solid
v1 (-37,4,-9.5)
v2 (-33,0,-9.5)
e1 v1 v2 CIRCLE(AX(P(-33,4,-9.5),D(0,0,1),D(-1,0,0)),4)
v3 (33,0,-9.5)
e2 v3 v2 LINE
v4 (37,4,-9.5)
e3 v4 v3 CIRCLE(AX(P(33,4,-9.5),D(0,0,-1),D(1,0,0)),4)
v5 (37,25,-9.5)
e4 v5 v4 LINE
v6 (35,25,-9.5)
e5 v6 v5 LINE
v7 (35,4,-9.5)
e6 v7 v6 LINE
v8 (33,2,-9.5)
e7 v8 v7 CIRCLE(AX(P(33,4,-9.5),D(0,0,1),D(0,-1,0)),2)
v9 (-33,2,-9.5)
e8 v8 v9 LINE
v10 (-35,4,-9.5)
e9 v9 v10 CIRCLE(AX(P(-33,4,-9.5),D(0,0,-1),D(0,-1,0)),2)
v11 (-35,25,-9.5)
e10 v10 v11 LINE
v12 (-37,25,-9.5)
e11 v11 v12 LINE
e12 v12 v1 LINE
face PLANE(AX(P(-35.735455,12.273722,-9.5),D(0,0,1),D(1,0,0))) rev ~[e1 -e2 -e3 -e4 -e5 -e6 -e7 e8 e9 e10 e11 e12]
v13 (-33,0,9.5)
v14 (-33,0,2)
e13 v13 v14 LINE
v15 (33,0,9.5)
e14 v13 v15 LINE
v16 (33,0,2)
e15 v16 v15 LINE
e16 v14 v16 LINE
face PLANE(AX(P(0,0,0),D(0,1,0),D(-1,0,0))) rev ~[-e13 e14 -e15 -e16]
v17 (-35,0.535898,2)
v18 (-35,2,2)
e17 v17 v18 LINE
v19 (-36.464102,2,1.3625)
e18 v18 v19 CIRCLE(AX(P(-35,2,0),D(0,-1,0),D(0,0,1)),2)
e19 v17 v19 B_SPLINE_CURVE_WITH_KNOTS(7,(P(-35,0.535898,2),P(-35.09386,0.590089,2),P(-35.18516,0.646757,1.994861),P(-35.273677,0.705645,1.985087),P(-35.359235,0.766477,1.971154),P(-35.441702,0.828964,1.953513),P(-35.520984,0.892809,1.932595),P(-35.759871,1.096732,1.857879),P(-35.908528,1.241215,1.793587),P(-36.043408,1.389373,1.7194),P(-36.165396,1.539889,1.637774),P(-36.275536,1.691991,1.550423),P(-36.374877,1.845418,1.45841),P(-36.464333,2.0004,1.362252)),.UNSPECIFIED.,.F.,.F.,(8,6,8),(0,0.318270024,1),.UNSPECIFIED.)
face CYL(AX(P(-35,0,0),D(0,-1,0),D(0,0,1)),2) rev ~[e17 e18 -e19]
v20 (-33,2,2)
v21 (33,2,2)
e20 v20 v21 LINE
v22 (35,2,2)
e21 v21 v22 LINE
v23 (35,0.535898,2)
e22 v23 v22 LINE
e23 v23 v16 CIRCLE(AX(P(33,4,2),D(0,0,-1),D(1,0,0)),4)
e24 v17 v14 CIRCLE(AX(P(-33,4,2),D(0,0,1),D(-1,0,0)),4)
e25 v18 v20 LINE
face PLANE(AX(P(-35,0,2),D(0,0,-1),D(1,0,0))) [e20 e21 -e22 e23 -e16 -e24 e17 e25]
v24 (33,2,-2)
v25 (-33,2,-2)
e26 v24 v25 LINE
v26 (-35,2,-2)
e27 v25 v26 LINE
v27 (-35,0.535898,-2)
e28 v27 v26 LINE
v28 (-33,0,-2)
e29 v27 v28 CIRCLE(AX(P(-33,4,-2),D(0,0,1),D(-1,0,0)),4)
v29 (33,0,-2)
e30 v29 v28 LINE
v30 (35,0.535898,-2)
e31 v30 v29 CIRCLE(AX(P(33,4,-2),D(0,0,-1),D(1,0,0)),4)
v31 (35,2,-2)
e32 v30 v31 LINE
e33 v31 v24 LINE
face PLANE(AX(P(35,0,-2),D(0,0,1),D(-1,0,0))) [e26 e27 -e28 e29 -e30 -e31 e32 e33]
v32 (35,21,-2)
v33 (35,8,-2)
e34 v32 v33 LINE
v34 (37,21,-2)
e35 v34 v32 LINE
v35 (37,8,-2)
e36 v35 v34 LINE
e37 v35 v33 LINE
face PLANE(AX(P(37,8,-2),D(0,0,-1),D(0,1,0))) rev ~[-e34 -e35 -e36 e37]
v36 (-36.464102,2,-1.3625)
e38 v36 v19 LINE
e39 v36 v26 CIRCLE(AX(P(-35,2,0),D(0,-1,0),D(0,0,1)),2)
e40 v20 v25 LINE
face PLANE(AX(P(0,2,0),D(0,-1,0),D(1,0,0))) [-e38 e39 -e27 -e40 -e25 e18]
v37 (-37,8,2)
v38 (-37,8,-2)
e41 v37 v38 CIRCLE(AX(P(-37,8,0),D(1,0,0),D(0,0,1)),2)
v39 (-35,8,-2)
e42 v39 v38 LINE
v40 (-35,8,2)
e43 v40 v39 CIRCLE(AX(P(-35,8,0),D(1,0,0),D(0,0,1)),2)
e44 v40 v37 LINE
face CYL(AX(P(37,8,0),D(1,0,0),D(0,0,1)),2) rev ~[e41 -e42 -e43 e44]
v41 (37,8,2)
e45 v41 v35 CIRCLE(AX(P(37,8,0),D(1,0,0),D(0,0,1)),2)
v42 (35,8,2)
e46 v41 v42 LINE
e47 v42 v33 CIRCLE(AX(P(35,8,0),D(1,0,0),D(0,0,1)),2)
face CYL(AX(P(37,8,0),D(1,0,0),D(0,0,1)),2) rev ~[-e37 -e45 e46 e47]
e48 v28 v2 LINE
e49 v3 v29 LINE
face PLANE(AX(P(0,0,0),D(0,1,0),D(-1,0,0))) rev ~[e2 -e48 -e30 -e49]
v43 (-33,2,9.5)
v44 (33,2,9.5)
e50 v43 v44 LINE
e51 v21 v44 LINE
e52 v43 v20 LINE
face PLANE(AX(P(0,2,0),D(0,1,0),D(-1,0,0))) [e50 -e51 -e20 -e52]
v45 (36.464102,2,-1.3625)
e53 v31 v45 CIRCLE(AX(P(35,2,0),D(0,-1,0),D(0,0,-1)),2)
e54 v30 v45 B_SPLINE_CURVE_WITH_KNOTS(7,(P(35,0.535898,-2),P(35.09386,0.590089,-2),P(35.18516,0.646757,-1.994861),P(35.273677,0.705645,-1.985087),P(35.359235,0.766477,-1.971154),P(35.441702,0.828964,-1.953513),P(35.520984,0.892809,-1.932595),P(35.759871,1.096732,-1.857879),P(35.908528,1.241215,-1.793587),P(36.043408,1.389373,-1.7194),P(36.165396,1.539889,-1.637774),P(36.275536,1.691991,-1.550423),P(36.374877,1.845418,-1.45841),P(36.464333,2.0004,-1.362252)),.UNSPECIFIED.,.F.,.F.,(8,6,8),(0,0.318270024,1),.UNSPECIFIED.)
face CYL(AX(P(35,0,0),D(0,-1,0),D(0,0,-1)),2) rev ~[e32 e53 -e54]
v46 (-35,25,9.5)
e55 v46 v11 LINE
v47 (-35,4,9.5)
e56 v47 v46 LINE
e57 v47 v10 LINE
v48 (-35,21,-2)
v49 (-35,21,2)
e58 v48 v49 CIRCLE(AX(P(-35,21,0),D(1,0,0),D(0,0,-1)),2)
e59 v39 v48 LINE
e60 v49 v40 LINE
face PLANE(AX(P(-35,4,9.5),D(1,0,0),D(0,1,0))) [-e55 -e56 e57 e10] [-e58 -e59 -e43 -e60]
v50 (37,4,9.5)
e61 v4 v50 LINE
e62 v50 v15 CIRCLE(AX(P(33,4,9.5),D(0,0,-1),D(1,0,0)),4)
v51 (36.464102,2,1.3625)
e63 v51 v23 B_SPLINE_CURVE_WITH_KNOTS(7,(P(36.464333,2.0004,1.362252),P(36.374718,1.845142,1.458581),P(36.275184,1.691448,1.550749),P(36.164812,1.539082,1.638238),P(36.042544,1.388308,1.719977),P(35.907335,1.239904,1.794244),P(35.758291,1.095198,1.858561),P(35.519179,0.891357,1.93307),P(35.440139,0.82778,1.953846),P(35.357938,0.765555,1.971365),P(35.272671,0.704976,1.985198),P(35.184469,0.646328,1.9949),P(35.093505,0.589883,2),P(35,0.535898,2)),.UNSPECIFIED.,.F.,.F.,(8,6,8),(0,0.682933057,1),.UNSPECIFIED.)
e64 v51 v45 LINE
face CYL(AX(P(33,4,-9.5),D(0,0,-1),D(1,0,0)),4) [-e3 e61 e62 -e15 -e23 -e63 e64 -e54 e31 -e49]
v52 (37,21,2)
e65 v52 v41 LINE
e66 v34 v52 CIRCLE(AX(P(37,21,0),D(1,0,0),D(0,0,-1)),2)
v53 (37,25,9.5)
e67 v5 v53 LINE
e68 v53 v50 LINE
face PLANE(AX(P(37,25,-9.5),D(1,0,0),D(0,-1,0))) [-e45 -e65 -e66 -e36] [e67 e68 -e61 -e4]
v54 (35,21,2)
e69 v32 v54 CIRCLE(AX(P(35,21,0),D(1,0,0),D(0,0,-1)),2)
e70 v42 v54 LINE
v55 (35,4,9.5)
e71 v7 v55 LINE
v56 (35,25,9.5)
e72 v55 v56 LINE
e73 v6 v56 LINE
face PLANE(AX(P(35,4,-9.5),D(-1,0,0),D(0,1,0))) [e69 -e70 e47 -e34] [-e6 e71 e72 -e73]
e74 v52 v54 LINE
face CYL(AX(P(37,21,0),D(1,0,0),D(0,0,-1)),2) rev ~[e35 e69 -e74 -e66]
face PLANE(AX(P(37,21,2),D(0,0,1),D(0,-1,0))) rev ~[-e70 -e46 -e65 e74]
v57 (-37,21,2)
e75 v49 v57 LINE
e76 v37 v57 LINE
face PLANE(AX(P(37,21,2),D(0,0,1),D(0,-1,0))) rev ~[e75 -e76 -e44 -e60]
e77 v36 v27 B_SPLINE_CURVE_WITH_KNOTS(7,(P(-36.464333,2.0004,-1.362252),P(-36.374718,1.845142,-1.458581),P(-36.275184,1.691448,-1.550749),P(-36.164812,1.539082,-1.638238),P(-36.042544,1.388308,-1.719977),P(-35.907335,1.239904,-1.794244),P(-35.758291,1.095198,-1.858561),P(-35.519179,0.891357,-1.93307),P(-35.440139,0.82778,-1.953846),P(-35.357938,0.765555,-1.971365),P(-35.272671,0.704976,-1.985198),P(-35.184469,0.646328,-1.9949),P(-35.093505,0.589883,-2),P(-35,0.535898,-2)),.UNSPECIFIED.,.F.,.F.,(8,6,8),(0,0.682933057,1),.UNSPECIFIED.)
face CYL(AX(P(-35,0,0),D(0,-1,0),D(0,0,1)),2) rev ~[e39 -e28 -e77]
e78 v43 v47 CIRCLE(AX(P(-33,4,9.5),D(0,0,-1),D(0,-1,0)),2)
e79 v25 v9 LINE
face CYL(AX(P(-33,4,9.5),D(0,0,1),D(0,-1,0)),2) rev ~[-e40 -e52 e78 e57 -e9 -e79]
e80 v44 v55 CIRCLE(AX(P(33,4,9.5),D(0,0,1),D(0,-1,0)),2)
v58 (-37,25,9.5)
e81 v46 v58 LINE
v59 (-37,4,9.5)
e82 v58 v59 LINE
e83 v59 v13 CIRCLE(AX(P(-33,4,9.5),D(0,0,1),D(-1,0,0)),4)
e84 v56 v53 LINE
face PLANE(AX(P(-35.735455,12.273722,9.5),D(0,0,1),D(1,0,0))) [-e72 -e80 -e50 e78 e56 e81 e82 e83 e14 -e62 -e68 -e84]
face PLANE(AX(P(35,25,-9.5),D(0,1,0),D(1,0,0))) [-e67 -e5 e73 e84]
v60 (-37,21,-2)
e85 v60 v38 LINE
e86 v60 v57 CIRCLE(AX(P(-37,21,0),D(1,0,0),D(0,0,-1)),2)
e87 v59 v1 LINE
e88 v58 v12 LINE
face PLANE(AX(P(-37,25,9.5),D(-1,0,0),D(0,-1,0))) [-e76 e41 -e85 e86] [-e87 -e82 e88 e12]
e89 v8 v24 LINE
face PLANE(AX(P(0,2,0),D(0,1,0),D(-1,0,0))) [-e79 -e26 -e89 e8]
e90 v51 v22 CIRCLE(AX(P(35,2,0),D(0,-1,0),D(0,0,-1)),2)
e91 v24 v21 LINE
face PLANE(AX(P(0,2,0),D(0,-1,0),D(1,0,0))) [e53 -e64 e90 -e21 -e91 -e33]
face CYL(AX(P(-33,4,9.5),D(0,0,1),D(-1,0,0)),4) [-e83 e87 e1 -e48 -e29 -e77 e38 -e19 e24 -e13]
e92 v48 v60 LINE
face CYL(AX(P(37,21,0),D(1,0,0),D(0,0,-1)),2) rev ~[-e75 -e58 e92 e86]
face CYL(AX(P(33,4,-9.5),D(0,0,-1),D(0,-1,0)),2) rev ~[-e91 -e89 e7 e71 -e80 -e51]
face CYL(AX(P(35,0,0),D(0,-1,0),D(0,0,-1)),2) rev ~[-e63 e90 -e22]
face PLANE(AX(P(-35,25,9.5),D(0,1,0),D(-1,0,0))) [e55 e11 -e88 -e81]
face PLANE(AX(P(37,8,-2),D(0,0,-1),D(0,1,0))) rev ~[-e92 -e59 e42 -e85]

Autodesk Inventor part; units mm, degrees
ref_plane "YZ Plane" through (0, 0, 0) normal (1, 0, 0) x (0, 1, 0)
ref_plane "XZ Plane" through (0, 0, 0) normal (0, 1, 0) x (-1, 0, 0)
ref_plane "XY Plane" through (0, 0, 0) normal (0, 0, 1) x (1, 0, 0)
sketch "スケッチ1" plane through (0, 0, 0) normal (0, 1, 0) x (-1, 0, 0)
  line L0 (-37, -9.5) -> (37, -9.5)
  line L1 (37, -9.5) -> (37, 9.5)
  line L2 (37, 9.5) -> (-37, 9.5)
  line L3 (-37, 9.5) -> (-37, -9.5)
  line L4 (-37, -9.5) -> (37, 9.5) construction
  line L5 (37, -9.5) -> (-37, 9.5) construction
  point P0 (0, 0)
  dimension "d0" = 74
  dimension "d1" = 19
extrude "プレート1" add sketch "スケッチ1" along normal blind 2
sketch "スケッチ2" plane through (35, 0, -9.5) normal (1, 0, 0) x (0, 1, 0)
  line L0 (0, 19) -> (0, 0)
  line L1 (0, 0) -> (25, 0)
  line L2 (25, 0) -> (25, 19)
  line L3 (25, 19) -> (0, 19)
edge flange "フランジ1" height 25 angle 90 thickness 2 bend radius 2 thickness toward (1, 0, 0) relief tear relief width 2 relief depth 1 edges at (37, 2, 0) wall of the first edge with corners at (35, 0, 9.5) (35, 0, -9.5) (35, 25, -9.5) (35, 25, 9.5)
bend "曲げ1"
corner "コーナー1"
sketch "スケッチ3" plane through (-35, 0, 9.5) normal (-1, 0, 0) x (0, -1, 0)
  line L0 (0, -19) -> (0, 0)
  line L1 (0, 0) -> (-25, 0)
  line L2 (-25, 0) -> (-25, -19)
  line L3 (-25, -19) -> (0, -19)
edge flange "フランジ2" height 25 angle 90 thickness 2 bend radius 2 thickness toward (-1, 0, 0) relief tear relief width 2 relief depth 1 edges at (-37, 2, 0) wall of the first edge with corners at (-35, 0, -9.5) (-35, 0, 9.5) (-35, 25, 9.5) (-35, 25, -9.5)
bend "曲げ2"
corner "コーナー2"
sketch "スケッチ5" plane through (0, 0, 0) normal (0, -1, 0) x (1, 0, 0)
  arc A0 (-35, 2) -> (-35, -2) centre (-35, 0) ccw
  arc A1 (35, -2) -> (35, 2) centre (35, 0) ccw
  line L0 (-35, 2) -> (35, 2)
  line L1 (35, -2) -> (-35, -2)
  point P0 (0, 0)
  dimension "d31" = 4
  dimension "d32" = 2
  dimension "d33" = 2
  dimension "d34" = 2
  dimension "d35" = 35
  dimension "d36" = 35
extrude "押し出し1" cut sketch "スケッチ5" against normal blind 2
sketch "スケッチ6" plane through (37, 25, 9.5) normal (1, 0, 0) x (0, 0, -1)
  point P0 (9.5, -25)
sketch "スケッチ7" plane through (37, 25, 9.5) normal (1, 0, 0) x (0, 0, -1)
  line L0 (7.5, -4) -> (7.5, -17)
  arc A0 (7.5, -17) -> (11.5, -17) centre (9.5, -17) ccw
  line L1 (11.5, -17) -> (11.5, -4)
  arc A1 (11.5, -4) -> (7.5, -4) centre (9.5, -4) ccw
  line L2 (0, 0) -> (19, 0) projected
  line L3 (0, -21) -> (19, -21) projected
  point P0 (9.5, -25)
  point P1 (9.5, 0)
  dimension "d45" = 4
  dimension "d46" = 4
  dimension "d47" = 2
extrude "押し出し2" cut sketch "スケッチ7" against normal blind 100
equation "\"d2\" = Thickness"
equation "\"d3\" = BendReliefWidth"
equation "\"d4\" = BendReliefDepth"
equation "\"d5\" = MinimumRemnant"
equation "\"d6\" = TransitionRadius"
equation "\"d9\" = BendRadius"
equation "\"d10\" = CornerReliefSize"
equation "\"d11\" = GapSize"
equation "\"d12\" = JacobiRadiusSize"
equation "\"d13\" = BendReliefWidth"
equation "\"d14\" = BendReliefDepth"
equation "\"d15\" = MinimumRemnant"
equation "\"d16\" = TransitionRadius"
equation "\"d19\" = BendRadius"
equation "\"d20\" = CornerReliefSize"
equation "\"d21\" = GapSize"
equation "\"d22\" = JacobiRadiusSize"
equation "\"BendRadius\" = Thickness"
equation "\"BendReliefWidth\" = Thickness"
equation "\"BendReliefDepth\" = 0.5 * Thickness"
equation "\"CornerReliefSize\" = 4 * Thickness"
equation "\"MinimumRemnant\" = 2 * Thickness"
equation "\"TransitionRadius\" = BendRadius"
equation "\"JacobiRadiusSize\" = BendRadius"
equation "\"GapSize\" = Thickness"
equation "\"Thickness\" = 2"
properties part number "main_key_cup_col0" material "アルミニウム 6061"
